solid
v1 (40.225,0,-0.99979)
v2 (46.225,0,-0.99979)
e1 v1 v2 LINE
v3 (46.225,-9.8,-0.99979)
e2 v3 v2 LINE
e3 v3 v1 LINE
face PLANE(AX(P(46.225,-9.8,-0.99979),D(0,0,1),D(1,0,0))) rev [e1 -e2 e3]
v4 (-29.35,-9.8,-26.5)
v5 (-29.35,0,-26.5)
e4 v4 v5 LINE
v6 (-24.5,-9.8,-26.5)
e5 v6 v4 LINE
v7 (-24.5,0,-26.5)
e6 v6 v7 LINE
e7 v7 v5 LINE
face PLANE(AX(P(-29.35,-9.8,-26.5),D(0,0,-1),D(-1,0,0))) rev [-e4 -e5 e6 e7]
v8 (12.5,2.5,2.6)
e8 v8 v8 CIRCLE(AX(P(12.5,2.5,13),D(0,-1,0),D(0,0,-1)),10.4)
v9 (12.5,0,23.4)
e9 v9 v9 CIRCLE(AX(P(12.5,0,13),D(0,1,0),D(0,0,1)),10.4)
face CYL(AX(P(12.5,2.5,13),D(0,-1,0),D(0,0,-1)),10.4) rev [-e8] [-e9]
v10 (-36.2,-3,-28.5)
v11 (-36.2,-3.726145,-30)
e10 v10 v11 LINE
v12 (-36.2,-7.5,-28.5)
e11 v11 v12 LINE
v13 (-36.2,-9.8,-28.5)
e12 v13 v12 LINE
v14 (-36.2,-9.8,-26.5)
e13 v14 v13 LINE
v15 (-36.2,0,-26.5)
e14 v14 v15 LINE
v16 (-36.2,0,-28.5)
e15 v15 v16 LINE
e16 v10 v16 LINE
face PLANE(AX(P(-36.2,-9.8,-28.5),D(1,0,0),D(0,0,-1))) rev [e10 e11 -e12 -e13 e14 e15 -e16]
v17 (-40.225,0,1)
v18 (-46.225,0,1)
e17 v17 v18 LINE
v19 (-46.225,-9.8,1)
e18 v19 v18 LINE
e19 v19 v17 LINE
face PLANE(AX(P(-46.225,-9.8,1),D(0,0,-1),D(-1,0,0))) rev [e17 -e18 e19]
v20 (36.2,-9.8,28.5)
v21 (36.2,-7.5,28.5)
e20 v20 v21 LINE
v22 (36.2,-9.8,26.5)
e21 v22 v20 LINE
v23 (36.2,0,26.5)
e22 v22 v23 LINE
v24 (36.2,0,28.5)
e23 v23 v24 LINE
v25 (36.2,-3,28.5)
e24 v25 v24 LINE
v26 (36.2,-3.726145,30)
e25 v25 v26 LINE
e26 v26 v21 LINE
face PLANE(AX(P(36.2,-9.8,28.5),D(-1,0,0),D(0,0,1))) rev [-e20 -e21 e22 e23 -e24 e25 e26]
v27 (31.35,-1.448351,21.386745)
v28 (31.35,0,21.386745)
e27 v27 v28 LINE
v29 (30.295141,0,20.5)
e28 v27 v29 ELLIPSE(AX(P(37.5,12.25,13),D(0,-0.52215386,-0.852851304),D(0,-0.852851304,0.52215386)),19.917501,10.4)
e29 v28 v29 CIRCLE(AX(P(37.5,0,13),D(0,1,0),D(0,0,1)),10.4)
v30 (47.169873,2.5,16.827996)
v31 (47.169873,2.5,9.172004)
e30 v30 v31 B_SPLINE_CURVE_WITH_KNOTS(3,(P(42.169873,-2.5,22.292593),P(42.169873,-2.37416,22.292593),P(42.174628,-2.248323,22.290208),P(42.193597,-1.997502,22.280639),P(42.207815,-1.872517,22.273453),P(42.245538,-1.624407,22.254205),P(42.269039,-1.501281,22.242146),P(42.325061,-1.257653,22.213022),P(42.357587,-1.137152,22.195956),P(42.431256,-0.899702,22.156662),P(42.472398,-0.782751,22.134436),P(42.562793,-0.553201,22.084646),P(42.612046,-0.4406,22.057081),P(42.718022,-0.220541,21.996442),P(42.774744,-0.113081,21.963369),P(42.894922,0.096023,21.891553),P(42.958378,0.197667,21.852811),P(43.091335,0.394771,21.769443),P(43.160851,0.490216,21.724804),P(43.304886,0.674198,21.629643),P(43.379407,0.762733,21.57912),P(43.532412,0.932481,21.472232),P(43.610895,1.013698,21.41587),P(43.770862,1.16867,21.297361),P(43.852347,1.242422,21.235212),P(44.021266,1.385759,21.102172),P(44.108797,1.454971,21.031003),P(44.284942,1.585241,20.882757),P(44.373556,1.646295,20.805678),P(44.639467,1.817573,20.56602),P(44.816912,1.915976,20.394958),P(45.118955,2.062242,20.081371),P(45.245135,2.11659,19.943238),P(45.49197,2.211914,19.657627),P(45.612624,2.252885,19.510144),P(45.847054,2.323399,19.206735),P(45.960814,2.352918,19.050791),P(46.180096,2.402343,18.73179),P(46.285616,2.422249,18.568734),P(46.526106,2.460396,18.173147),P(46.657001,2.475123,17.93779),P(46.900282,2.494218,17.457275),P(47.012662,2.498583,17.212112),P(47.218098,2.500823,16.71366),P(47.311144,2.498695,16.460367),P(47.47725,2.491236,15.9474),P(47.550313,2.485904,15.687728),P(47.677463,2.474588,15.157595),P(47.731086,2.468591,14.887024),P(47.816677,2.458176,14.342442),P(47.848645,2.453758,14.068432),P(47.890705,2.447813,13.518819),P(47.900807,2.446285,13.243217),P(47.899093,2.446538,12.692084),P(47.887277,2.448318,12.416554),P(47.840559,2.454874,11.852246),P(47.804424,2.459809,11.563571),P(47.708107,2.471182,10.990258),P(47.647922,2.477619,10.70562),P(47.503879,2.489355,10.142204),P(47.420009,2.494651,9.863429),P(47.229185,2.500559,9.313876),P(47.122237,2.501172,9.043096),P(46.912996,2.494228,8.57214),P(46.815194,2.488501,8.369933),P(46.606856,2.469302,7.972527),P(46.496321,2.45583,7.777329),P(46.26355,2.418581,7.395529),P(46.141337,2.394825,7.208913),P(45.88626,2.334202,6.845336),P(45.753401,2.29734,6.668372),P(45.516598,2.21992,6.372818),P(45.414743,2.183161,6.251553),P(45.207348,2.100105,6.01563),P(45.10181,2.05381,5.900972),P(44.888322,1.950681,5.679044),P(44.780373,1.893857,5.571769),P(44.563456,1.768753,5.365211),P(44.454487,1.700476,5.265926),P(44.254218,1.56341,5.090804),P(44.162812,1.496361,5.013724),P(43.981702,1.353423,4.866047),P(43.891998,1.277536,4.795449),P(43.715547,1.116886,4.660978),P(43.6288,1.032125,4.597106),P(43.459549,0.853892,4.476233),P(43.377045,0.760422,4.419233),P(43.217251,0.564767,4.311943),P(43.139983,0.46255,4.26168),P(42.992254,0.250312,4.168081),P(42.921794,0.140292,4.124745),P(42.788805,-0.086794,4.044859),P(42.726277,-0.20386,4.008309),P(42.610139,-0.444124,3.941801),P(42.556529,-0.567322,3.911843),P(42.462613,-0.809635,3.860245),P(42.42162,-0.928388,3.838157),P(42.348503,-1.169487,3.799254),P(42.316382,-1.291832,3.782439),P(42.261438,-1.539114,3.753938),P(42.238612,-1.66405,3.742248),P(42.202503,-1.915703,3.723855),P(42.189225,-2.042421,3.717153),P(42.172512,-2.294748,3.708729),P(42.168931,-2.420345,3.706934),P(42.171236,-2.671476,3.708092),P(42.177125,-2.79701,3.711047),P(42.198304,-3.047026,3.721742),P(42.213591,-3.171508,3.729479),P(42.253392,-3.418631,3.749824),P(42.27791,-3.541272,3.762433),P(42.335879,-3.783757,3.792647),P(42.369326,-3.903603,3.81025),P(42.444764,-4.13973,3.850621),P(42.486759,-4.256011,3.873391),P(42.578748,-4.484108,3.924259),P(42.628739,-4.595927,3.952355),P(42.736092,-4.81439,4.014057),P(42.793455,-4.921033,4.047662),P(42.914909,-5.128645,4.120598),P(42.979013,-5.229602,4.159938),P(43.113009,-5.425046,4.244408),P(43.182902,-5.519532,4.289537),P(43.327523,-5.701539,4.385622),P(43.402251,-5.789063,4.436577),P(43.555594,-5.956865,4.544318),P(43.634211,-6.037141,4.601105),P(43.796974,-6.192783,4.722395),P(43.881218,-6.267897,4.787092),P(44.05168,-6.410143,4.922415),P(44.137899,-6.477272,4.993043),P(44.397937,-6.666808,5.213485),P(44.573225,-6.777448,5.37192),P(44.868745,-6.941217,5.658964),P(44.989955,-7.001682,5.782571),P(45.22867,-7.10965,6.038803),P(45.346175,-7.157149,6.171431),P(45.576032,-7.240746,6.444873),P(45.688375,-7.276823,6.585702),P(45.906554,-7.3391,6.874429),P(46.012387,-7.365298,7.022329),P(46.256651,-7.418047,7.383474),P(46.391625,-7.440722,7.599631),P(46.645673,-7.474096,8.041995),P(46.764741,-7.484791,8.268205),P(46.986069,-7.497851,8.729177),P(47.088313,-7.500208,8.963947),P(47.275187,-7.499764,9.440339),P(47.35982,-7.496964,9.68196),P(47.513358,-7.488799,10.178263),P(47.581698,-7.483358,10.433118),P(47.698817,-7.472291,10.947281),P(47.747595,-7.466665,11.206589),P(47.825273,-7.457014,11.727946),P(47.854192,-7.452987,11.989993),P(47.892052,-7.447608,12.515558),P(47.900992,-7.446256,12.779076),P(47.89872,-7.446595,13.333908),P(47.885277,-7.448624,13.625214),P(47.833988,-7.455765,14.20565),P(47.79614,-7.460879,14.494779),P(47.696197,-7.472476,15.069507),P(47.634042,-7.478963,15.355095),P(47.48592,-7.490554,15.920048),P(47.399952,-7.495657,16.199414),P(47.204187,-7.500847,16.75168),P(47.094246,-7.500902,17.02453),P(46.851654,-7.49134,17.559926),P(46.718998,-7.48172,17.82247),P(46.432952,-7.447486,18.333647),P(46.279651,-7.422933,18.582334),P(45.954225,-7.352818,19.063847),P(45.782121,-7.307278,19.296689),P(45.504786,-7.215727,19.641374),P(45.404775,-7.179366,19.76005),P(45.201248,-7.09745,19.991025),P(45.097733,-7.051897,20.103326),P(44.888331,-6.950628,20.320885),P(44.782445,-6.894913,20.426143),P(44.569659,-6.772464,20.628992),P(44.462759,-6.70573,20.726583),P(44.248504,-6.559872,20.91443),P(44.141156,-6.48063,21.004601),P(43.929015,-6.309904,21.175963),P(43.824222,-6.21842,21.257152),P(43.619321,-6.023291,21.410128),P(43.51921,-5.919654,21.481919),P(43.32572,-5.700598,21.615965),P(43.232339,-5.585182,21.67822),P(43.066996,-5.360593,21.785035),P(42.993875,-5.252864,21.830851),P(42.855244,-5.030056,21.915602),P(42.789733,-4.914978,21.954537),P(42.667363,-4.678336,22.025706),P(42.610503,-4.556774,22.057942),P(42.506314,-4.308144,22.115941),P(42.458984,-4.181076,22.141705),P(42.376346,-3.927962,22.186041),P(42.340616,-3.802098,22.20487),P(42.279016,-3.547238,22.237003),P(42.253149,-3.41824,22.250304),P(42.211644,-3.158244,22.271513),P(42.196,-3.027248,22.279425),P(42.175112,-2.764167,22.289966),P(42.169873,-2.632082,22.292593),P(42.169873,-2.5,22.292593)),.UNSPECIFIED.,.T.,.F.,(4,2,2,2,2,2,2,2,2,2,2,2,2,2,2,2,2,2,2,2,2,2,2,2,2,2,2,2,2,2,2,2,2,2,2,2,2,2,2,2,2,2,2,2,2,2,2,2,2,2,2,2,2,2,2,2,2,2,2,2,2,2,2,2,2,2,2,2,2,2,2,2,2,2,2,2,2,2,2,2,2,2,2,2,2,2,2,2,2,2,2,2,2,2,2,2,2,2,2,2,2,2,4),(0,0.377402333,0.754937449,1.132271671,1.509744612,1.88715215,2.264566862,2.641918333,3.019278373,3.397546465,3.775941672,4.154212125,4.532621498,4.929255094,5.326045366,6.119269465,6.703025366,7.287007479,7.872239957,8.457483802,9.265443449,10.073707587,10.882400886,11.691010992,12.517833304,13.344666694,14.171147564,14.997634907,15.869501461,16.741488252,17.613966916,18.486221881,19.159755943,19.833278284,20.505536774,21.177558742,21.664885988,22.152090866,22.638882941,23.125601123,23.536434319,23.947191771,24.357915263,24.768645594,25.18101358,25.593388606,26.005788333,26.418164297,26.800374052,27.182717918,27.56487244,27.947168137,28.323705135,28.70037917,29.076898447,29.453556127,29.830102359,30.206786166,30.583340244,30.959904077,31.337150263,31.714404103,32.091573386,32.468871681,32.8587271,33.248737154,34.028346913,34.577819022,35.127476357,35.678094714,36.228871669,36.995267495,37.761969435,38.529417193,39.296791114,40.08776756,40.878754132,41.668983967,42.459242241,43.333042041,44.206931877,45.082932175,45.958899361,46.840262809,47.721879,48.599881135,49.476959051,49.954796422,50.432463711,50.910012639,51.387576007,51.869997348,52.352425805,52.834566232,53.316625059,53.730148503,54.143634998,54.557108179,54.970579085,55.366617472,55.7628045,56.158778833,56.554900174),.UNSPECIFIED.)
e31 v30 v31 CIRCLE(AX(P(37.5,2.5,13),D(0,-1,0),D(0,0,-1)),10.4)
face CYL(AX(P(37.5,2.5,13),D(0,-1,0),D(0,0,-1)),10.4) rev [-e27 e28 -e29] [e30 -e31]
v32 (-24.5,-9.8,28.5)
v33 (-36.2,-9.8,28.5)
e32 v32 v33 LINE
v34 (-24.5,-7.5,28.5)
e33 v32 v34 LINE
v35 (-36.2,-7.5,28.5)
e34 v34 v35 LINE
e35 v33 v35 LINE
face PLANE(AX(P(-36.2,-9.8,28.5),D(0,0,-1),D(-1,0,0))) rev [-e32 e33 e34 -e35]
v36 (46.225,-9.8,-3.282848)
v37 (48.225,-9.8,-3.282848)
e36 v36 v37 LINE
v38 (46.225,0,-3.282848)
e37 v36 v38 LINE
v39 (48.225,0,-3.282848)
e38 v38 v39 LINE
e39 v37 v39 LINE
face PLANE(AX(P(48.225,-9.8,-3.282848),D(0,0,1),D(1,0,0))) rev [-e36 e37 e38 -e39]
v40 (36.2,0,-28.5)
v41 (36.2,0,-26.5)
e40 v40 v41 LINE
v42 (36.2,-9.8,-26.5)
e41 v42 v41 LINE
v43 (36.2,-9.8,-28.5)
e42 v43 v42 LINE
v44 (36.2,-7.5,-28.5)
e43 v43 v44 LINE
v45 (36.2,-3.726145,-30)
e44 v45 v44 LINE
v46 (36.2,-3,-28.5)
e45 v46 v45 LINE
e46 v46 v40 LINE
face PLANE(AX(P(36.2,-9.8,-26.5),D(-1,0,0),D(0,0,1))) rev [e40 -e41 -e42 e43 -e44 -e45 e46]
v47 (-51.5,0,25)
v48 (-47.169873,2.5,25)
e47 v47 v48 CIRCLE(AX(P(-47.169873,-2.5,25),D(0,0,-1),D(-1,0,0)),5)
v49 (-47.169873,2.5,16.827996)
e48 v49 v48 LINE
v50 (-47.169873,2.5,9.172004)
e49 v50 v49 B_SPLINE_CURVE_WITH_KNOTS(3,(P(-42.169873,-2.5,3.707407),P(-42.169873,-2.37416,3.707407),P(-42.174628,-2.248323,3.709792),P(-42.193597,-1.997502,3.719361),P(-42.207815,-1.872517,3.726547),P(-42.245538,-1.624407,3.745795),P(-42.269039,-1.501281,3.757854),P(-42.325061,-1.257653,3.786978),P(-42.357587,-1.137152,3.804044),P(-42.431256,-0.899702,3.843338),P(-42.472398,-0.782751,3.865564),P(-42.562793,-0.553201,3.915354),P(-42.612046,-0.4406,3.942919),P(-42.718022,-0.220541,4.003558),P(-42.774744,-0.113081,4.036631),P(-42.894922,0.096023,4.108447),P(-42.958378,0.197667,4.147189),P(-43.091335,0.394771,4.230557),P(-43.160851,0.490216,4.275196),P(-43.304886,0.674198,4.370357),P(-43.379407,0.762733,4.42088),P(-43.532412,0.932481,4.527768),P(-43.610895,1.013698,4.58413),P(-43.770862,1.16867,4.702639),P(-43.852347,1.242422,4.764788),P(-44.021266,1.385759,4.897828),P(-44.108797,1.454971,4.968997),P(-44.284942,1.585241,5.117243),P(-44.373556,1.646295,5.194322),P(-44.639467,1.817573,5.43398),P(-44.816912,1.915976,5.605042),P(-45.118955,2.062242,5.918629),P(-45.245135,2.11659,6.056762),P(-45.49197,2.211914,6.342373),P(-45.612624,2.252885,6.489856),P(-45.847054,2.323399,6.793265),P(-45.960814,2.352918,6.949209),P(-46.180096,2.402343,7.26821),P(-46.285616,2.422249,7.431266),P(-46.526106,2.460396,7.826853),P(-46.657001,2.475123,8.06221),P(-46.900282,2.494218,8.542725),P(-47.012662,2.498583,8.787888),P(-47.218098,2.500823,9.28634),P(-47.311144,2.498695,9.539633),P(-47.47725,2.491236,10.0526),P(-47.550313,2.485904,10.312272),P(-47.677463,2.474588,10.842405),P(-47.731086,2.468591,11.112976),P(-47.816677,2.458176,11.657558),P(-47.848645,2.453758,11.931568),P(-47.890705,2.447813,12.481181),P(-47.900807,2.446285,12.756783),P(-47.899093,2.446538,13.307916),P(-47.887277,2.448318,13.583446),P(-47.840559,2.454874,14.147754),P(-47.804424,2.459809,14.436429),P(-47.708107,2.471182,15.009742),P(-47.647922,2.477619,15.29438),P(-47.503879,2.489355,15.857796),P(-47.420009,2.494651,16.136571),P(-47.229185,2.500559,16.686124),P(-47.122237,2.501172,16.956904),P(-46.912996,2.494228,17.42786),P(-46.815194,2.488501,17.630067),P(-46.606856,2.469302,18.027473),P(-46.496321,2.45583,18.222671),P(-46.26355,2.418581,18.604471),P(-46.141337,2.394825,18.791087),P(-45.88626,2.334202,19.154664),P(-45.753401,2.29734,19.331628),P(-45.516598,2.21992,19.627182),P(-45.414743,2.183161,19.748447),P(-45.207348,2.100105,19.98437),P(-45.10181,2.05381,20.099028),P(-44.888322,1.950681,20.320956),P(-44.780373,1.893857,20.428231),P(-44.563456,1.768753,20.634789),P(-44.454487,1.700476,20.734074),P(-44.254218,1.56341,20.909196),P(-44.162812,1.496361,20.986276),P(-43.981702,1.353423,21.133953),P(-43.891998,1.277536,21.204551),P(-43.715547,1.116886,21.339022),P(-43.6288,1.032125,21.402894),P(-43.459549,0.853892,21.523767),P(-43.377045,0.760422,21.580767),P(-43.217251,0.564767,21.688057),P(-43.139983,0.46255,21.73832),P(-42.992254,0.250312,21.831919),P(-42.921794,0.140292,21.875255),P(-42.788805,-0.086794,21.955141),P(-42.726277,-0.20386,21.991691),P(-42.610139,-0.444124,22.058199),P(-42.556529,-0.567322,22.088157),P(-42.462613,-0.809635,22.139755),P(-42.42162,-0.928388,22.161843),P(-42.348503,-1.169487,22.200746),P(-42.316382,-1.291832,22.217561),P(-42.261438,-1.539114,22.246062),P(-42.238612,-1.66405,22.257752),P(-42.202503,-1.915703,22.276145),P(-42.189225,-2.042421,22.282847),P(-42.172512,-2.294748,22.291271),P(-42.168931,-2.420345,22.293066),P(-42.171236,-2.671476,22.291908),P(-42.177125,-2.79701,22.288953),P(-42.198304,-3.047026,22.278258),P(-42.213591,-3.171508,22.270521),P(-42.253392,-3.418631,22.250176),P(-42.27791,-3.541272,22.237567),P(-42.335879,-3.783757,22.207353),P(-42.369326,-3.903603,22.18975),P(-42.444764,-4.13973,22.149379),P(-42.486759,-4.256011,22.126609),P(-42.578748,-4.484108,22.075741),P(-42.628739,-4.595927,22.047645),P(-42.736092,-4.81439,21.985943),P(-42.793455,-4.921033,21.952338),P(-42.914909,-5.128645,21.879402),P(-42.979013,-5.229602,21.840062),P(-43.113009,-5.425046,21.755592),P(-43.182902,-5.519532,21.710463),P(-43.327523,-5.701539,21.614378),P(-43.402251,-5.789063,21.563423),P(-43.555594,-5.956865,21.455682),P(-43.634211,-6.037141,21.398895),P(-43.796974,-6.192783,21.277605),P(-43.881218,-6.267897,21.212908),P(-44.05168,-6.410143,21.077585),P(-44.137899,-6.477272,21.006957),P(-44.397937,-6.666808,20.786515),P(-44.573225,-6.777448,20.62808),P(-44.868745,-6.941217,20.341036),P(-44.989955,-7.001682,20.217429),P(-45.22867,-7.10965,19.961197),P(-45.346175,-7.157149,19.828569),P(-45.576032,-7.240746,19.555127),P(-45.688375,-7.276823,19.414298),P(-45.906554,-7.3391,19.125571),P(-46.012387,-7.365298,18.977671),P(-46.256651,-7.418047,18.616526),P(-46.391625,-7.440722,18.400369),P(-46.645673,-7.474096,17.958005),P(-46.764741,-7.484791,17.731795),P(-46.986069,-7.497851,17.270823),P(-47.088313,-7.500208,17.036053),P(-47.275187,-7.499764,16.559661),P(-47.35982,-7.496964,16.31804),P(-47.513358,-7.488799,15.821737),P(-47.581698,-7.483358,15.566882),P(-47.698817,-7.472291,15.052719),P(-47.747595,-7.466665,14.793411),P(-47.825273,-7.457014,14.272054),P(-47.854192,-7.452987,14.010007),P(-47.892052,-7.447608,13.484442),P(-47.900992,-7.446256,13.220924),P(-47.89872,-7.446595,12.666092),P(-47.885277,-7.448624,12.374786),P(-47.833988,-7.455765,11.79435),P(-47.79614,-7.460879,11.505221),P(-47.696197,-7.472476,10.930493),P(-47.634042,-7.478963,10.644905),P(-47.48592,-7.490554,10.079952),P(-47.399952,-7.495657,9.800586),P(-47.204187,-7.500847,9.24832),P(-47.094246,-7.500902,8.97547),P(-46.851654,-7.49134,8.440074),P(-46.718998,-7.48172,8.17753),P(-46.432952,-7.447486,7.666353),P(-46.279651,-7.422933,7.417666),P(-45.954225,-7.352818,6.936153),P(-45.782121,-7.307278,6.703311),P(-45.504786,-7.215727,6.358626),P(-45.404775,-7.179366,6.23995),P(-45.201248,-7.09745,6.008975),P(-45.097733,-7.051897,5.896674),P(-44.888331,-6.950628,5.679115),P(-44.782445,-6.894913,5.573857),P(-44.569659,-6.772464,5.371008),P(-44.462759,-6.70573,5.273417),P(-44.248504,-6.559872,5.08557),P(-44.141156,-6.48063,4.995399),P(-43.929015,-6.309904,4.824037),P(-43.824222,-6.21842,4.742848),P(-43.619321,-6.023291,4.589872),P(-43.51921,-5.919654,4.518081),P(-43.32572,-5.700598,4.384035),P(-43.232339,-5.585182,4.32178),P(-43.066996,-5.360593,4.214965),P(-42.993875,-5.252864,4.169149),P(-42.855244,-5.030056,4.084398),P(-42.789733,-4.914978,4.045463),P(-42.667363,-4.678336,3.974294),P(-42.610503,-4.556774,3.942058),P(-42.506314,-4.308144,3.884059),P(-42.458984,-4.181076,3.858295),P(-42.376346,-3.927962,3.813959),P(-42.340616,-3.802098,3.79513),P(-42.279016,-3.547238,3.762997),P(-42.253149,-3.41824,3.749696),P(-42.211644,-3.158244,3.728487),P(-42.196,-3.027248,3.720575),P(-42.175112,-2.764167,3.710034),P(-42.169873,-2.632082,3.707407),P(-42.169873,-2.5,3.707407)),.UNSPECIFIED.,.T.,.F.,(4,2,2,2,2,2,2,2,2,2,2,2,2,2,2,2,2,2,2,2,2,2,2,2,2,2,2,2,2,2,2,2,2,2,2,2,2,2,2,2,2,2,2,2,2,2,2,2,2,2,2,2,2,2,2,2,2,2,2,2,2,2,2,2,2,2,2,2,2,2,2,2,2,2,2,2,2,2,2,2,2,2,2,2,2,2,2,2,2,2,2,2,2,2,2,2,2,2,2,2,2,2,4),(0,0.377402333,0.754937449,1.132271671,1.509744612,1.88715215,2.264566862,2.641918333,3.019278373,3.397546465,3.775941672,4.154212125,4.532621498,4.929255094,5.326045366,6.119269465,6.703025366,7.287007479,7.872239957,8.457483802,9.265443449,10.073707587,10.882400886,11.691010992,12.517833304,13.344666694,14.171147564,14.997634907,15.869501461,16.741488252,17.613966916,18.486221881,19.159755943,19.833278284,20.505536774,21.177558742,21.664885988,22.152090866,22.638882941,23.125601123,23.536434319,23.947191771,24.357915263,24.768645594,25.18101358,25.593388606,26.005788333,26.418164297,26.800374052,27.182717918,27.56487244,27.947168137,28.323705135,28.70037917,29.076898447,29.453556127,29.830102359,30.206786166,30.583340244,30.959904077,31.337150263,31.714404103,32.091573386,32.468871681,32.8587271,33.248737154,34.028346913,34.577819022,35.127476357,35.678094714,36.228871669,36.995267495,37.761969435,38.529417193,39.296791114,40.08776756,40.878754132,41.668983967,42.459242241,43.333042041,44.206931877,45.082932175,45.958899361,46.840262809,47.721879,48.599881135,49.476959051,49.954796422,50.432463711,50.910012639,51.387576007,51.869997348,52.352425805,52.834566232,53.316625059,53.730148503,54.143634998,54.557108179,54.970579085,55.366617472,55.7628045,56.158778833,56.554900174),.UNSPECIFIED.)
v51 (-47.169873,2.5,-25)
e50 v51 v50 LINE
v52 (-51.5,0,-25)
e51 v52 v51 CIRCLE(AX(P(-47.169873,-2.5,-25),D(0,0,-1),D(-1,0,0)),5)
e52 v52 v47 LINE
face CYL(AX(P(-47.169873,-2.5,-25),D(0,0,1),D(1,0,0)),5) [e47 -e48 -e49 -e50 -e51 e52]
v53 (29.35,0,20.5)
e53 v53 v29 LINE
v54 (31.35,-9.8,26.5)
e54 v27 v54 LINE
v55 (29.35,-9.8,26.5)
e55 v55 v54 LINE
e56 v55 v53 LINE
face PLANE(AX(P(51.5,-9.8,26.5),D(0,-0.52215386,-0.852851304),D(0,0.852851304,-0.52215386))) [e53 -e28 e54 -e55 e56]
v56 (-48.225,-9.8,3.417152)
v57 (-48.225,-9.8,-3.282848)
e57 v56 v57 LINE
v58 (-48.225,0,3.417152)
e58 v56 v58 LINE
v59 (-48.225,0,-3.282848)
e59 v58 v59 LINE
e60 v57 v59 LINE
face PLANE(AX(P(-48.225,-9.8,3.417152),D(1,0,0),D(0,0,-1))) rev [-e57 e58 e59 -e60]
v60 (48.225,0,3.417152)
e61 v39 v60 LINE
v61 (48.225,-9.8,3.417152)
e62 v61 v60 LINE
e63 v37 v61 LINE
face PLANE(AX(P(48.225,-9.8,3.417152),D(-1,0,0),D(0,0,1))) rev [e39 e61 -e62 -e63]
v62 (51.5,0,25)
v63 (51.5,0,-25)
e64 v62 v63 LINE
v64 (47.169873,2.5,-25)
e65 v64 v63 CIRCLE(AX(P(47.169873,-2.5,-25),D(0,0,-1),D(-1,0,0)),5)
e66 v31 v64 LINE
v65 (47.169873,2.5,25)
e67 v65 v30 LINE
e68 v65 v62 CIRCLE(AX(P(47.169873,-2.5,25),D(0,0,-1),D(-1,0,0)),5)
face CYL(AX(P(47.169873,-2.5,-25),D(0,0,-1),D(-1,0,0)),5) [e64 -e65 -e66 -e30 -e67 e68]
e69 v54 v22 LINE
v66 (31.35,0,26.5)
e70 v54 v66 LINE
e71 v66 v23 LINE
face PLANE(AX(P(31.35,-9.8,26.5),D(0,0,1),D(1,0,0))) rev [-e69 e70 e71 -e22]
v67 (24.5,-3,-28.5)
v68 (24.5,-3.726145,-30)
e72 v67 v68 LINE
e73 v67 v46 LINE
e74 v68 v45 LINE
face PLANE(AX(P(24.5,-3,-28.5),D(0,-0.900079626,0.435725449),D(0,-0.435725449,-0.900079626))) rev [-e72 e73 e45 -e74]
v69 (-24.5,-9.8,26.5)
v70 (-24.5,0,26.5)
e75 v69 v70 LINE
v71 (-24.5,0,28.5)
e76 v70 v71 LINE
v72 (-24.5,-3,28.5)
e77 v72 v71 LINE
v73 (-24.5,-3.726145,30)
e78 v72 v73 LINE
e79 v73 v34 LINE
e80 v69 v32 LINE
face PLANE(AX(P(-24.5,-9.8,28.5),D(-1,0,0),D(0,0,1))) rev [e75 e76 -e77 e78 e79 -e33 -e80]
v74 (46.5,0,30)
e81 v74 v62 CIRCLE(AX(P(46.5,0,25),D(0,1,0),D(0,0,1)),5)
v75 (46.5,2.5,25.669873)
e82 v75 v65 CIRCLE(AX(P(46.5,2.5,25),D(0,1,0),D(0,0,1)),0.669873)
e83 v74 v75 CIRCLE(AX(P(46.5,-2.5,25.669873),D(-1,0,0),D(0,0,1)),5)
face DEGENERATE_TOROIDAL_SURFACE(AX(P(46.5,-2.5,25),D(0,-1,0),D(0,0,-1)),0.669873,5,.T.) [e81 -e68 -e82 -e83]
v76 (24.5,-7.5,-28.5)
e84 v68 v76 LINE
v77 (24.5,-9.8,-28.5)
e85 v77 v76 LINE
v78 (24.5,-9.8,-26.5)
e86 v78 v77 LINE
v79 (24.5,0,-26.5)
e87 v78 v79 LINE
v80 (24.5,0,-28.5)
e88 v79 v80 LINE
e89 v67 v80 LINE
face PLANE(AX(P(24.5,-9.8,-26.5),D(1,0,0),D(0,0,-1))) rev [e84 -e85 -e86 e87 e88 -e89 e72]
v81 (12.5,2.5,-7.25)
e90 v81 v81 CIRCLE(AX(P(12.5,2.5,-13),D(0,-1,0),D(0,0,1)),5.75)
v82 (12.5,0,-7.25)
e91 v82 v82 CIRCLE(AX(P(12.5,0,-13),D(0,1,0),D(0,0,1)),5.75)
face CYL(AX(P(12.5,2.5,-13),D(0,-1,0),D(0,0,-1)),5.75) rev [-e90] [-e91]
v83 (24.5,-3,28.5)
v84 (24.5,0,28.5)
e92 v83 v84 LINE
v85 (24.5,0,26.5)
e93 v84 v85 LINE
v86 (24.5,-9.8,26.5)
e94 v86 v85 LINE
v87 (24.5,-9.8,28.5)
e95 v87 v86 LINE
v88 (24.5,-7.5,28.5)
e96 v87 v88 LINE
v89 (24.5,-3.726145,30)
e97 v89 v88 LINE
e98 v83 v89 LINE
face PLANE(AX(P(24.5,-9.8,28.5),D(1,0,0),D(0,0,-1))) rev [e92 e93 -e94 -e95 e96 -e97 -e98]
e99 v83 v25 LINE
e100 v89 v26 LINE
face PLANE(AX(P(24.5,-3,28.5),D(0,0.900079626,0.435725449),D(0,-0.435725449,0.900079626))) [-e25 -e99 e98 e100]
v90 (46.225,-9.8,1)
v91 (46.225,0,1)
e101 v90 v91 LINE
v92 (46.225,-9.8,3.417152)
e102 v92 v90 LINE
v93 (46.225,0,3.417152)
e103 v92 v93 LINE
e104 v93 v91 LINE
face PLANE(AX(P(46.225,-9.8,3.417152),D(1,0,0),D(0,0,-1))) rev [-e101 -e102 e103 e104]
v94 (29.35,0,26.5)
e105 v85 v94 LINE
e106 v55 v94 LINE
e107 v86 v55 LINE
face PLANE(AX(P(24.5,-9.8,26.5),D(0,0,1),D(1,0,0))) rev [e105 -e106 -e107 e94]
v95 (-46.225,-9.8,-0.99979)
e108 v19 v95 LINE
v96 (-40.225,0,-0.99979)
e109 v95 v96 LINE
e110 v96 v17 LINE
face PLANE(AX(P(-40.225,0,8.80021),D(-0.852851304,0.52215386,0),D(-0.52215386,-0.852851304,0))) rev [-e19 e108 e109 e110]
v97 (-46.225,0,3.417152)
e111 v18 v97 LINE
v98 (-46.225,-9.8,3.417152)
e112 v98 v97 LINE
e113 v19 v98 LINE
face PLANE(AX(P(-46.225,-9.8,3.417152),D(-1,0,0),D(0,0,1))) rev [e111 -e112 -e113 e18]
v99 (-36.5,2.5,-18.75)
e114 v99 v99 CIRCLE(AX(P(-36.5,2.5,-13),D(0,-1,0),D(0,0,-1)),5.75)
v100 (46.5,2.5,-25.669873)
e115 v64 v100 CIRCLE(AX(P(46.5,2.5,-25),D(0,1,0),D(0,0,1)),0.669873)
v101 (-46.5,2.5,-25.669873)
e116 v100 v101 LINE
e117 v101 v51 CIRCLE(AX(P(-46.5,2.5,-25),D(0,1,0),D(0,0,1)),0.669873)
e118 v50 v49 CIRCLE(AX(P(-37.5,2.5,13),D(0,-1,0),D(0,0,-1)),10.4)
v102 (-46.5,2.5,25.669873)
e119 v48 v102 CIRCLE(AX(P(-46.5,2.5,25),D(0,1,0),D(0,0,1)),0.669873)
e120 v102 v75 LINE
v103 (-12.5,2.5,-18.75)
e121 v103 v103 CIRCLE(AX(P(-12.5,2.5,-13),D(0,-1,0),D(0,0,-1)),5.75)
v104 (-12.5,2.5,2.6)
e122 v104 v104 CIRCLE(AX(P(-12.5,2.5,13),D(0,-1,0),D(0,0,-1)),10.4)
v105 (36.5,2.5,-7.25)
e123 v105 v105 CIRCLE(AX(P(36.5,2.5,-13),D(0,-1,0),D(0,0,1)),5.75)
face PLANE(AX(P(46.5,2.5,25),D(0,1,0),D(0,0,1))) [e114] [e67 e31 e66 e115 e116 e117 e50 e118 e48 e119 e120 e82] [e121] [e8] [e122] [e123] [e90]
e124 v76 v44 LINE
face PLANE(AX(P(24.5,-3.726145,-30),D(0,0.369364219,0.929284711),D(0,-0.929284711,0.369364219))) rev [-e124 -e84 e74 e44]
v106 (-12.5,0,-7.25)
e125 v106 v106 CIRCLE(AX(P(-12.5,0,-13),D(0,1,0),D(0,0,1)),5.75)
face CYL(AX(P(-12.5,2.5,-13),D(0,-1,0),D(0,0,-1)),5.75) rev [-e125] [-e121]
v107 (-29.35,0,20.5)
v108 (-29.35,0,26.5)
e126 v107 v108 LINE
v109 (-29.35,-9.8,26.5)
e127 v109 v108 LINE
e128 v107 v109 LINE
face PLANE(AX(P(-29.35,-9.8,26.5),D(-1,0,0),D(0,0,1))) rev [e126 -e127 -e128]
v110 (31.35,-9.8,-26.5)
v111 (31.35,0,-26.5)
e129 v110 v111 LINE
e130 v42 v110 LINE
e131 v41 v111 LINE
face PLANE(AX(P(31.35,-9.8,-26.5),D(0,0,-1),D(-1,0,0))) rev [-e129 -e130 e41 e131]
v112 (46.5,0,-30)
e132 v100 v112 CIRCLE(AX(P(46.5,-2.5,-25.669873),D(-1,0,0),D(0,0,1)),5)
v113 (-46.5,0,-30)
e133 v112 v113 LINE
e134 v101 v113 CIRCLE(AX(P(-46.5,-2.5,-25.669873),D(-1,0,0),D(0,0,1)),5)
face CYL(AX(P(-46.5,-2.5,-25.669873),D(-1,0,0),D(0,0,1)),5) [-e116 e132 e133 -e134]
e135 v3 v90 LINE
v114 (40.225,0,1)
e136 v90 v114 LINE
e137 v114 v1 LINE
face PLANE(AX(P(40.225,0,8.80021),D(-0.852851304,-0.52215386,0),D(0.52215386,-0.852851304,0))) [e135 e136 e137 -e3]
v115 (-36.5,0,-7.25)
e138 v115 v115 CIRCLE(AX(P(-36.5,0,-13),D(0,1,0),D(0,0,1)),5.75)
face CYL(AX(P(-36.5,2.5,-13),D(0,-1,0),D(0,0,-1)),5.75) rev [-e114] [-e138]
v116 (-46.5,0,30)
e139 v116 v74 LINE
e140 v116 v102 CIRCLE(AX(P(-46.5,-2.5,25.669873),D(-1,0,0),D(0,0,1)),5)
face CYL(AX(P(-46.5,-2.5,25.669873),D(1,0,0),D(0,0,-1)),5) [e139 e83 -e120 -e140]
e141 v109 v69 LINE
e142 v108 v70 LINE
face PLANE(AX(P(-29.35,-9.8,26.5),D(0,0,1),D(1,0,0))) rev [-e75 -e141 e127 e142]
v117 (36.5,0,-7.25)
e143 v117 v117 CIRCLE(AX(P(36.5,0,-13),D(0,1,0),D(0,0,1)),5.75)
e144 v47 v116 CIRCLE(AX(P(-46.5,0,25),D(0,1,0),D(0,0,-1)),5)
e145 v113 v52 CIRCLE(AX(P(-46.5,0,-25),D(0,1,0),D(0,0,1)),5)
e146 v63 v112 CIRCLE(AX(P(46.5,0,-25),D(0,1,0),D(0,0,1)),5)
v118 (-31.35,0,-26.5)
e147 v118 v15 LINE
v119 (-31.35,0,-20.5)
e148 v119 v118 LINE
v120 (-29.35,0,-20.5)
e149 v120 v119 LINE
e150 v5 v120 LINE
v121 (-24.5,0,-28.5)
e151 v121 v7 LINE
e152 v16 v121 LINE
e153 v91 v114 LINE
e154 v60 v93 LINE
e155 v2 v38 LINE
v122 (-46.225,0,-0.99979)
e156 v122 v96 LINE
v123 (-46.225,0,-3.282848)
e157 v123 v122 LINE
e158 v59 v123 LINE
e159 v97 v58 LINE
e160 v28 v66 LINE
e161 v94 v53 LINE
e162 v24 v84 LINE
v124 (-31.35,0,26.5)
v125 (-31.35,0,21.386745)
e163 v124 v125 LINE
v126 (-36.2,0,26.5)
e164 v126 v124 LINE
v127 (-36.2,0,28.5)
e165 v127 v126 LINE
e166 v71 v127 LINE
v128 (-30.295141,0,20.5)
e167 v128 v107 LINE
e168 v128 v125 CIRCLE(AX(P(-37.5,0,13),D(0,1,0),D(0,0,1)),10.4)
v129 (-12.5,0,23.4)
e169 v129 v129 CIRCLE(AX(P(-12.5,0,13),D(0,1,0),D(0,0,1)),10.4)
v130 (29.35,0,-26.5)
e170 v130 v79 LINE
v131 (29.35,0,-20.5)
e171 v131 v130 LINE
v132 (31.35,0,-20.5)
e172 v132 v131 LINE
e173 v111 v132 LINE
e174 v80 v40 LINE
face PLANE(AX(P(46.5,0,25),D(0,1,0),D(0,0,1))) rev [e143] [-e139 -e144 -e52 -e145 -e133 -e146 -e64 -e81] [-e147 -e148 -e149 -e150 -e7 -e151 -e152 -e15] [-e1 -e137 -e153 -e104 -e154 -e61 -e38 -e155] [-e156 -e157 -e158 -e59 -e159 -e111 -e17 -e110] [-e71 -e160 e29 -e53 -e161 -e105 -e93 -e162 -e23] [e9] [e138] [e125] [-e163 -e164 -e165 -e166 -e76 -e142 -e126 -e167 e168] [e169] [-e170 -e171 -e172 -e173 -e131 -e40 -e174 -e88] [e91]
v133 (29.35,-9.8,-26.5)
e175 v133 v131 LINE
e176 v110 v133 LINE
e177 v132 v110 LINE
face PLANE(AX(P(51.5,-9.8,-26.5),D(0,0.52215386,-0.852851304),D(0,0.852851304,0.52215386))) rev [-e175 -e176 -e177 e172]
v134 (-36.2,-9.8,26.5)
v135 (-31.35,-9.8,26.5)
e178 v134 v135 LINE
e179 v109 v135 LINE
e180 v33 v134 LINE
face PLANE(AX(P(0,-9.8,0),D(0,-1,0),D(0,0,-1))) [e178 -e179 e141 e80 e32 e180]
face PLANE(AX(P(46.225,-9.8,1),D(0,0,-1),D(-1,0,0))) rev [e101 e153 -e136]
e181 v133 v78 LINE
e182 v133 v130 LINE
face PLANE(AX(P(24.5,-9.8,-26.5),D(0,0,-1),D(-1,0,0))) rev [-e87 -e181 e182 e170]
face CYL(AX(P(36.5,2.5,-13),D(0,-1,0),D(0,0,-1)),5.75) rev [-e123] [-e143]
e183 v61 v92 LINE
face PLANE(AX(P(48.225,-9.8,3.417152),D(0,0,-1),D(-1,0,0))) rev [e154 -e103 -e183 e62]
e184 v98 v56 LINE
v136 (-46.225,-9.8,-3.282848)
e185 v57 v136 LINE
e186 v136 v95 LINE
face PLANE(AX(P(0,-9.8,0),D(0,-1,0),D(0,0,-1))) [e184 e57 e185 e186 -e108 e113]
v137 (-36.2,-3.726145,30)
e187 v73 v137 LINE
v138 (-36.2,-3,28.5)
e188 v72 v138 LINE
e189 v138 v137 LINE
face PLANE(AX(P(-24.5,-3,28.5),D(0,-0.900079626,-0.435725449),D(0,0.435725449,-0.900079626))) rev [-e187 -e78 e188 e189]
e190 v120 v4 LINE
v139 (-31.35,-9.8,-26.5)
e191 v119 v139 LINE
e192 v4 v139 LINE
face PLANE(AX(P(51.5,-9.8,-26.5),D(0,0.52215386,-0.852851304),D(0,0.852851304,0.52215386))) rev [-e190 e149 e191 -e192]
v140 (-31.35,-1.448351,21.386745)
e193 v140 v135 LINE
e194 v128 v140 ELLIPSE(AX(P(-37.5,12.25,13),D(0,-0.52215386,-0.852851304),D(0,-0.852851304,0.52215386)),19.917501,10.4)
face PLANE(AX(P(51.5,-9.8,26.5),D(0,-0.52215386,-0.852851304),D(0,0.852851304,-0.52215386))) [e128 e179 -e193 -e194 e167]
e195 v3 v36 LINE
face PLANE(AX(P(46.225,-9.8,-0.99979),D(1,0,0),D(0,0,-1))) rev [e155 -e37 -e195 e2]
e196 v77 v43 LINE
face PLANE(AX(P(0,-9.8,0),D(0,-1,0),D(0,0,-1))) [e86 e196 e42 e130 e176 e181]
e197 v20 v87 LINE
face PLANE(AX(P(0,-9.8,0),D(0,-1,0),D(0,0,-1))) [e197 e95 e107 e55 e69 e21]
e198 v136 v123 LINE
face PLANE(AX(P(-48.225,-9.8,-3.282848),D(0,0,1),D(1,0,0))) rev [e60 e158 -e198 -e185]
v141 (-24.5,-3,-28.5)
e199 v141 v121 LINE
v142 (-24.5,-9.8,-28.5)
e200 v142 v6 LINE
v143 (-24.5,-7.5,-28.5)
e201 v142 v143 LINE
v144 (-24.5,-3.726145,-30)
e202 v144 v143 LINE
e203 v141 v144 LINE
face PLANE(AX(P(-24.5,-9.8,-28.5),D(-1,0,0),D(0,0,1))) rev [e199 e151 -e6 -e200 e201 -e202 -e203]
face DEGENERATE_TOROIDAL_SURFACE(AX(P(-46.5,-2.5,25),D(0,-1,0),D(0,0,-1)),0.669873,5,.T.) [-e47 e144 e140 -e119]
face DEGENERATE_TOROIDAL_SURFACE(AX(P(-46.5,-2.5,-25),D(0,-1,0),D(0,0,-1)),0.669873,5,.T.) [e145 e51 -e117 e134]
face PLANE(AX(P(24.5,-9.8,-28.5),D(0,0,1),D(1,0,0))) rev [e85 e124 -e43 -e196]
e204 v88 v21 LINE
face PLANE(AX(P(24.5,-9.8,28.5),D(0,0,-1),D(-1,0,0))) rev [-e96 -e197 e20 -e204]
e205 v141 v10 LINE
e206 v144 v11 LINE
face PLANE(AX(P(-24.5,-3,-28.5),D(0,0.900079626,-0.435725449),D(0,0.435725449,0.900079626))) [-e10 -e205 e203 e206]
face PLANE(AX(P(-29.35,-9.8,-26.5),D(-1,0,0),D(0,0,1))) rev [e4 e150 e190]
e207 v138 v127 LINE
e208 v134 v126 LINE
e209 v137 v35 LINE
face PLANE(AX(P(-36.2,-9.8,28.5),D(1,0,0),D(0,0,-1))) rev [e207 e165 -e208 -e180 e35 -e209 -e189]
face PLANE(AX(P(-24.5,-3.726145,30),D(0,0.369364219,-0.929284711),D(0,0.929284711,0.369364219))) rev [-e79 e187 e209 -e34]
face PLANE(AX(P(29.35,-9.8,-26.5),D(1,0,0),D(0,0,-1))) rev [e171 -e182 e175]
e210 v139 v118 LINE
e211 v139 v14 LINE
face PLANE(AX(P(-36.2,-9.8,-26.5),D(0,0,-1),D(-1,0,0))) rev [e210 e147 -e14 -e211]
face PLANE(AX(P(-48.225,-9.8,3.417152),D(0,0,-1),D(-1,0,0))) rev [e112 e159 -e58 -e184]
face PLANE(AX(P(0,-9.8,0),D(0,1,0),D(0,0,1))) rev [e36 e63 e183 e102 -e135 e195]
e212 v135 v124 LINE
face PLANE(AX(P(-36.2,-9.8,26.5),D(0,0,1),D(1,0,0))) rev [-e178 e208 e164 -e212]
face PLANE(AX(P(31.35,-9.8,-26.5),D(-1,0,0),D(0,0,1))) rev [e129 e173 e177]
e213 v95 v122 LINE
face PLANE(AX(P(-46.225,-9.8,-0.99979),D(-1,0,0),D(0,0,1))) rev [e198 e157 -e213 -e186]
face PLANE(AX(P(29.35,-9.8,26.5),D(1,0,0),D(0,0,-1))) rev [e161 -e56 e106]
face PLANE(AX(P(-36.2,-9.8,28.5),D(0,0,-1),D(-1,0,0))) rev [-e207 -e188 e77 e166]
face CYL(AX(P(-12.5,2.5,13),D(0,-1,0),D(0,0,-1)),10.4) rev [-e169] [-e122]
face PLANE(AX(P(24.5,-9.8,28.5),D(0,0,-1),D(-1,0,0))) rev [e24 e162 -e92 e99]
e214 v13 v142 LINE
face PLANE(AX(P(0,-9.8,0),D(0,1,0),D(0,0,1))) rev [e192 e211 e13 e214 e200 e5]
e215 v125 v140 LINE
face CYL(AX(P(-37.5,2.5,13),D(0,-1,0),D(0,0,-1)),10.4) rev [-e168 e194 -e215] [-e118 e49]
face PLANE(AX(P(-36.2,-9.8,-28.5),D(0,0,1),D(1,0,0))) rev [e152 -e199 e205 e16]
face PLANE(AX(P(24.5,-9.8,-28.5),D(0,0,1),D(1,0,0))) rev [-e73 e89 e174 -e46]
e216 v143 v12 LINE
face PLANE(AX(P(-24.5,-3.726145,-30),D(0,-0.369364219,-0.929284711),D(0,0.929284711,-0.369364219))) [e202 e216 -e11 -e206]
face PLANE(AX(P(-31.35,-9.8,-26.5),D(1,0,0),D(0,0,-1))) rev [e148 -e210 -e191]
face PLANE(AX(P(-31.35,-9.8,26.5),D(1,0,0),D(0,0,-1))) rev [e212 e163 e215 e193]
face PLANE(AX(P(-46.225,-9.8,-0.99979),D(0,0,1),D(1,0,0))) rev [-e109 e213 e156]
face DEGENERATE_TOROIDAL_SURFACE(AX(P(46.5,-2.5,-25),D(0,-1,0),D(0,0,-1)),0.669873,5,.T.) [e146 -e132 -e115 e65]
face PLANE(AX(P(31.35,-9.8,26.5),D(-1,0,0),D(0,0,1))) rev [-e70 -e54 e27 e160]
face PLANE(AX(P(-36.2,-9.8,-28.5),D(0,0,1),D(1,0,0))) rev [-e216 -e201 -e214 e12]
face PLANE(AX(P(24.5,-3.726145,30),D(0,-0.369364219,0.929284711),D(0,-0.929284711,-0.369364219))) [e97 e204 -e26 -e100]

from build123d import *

# Parameters (mm, degrees)
BOSS_EXTRUDE1_DEPTH     = 2.5
FILLET1_R               = 5
BOSS_EXTRUDE2_DEPTH     = 9.8
CUT_EXTRUDE1_DEPTH      = 9.8
CUT_EXTRUDE2_DEPTH      = 89.657557489
BOSS_EXTRUDE3_DEPTH     = 11.7
MIRROR4_COPY_1_DEPTH    = 11.7
CUT_EXTRUDE3_DEPTH      = 61.401076149
CUT_EXTRUDE3_DEPTH_BACK = 61.401076149
SKETCH7_R               = 10.4
SKETCH7_R_2             = 5.75


with BuildPart() as part:
    # Sketch1 → Boss-Extrude1 (new body)
    with BuildSketch(Plane(origin=(0, 0, 0), x_dir=(1, 0, 0), z_dir=(0, 1, 0))):
        with BuildLine():
            Line((-46.5, 30), (46.5, 30))
            ThreePointArc((46.5, 30), (50.035533906, 28.535533906), (51.5, 25))
            Line((51.5, 25), (51.5, -25))
            ThreePointArc((51.5, -25), (50.035533906, -28.535533906), (46.5, -30))
            Line((46.5, -30), (-46.5, -30))
            ThreePointArc((-46.5, -30), (-50.035533906, -28.535533906), (-51.5, -25))
            Line((-51.5, -25), (-51.5, 25))
            ThreePointArc((-51.5, 25), (-50.035533906, 28.535533906), (-46.5, 30))
        make_face()
    extrude(amount=BOSS_EXTRUDE1_DEPTH)

    # Fillet1
    # the kernel refuses this fillet: 5 mm, written as the material it takes off along each edge
    with BuildSketch(Plane(origin=(-46.5, 2.5, -25), x_dir=(-1, 0, 0), z_dir=(0, 0, 1))) as fillet1_piece_1:
        with BuildLine():
            CenterArc((0.669872981, 5), FILLET1_R, 270, 60)
            Line((0.669872981, 0), (0.669872981, -0.1))
            Line((0.669872981, -0.1), (5, -0.1))
            Line((5, -0.1), (5.1, 0))
            ThreePointArc((5.1, 0), (5.1, 1.25), (5.08660254, 2.45))
            Line((5.08660254, 2.45), (5, 2.5))
        make_face()
    revolve(axis=Axis((-46.5, 2.5, -25), (0, -1, 0)), revolution_arc=90, mode=Mode.SUBTRACT)
    with BuildSketch(Plane(origin=(-46.5, 2.5, -30), x_dir=(0, -1, 0), z_dir=(1, 0, 0)), Plane(origin=(46.5, 2.5, 30), x_dir=(0, -1, 0), z_dir=(-1, 0, 0))) as fillet1_piece_2:
        with BuildLine():
            CenterArc((5, -4.330127019), FILLET1_R, 120, 60)
            Line((0, -4.330127019), (-0.1, -4.330127019))
            Line((-0.1, -4.330127019), (-0.1, 0))
            Line((-0.1, 0), (0, 0.1))
            ThreePointArc((0, 0.1), (1.25, 0.1), (2.45, 0.08660254))
            Line((2.45, 0.08660254), (2.5, 0))
        make_face()
    extrude(amount=93, mode=Mode.SUBTRACT)
    with BuildSketch(Plane(origin=(46.5, 2.5, -25), x_dir=(0, 0, -1), z_dir=(-1, 0, 0))) as fillet1_piece_3:
        with BuildLine():
            CenterArc((0.669872981, 5), FILLET1_R, 270, 60)
            Line((0.669872981, 0), (0.669872981, -0.1))
            Line((0.669872981, -0.1), (5, -0.1))
            Line((5, -0.1), (5.1, 0))
            ThreePointArc((5.1, 0), (5.1, 1.25), (5.08660254, 2.45))
            Line((5.08660254, 2.45), (5, 2.5))
        make_face()
    revolve(axis=Axis((46.5, 2.5, -25), (0, -1, 0)), revolution_arc=90, mode=Mode.SUBTRACT)
    with BuildSketch(Plane(origin=(51.5, 2.5, -25), x_dir=(0, -1, 0), z_dir=(0, 0, 1)), Plane(origin=(-51.5, 2.5, 25), x_dir=(0, -1, 0), z_dir=(0, 0, -1))) as fillet1_piece_4:
        with BuildLine():
            CenterArc((5, -4.330127019), FILLET1_R, 120, 60)
            Line((0, -4.330127019), (-0.1, -4.330127019))
            Line((-0.1, -4.330127019), (-0.1, 0))
            Line((-0.1, 0), (0, 0.1))
            ThreePointArc((0, 0.1), (1.25, 0.1), (2.45, 0.08660254))
            Line((2.45, 0.08660254), (2.5, 0))
        make_face()
    extrude(amount=50, mode=Mode.SUBTRACT)
    with BuildSketch(Plane(origin=(46.5, 2.5, 25), x_dir=(1, 0, 0), z_dir=(0, 0, -1))) as fillet1_piece_5:
        with BuildLine():
            CenterArc((0.669872981, 5), FILLET1_R, 270, 60)
            Line((0.669872981, 0), (0.669872981, -0.1))
            Line((0.669872981, -0.1), (5, -0.1))
            Line((5, -0.1), (5.1, 0))
            ThreePointArc((5.1, 0), (5.1, 1.25), (5.08660254, 2.45))
            Line((5.08660254, 2.45), (5, 2.5))
        make_face()
    revolve(axis=Axis((46.5, 2.5, 25), (0, -1, 0)), revolution_arc=90, mode=Mode.SUBTRACT)
    with BuildSketch(Plane(origin=(-46.5, 2.5, 25), x_dir=(0, 0, 1), z_dir=(1, 0, 0))) as fillet1_piece_6:
        with BuildLine():
            CenterArc((0.669872981, 5), FILLET1_R, 270, 60)
            Line((0.669872981, 0), (0.669872981, -0.1))
            Line((0.669872981, -0.1), (5, -0.1))
            Line((5, -0.1), (5.1, 0))
            ThreePointArc((5.1, 0), (5.1, 1.25), (5.08660254, 2.45))
            Line((5.08660254, 2.45), (5, 2.5))
        make_face()
    revolve(axis=Axis((-46.5, 2.5, 25), (0, -1, 0)), revolution_arc=90, mode=Mode.SUBTRACT)

    # Sketch2 → Boss-Extrude2 (add)
    with BuildSketch(Plane.XZ):
        Polygon((-36.2, 28.5), (-24.5, 28.5), (-24.5, 26.5), (-29.35, 26.5), (-29.35, 20.5), (-31.35, 20.5), (-31.35, 26.5), (-36.2, 26.5), align=None)
        Polygon((48.225, -3.282847821), (46.225, -3.282847821), (46.225, -0.999790058), (40.225, -0.999790058), (40.225, 1), (46.225, 1), (46.225, 3.417152179), (48.225, 3.417152179), align=None)
        Polygon((24.5, 28.5), (36.2, 28.5), (36.2, 26.5), (31.35, 26.5), (31.35, 20.5), (29.35, 20.5), (29.35, 26.5), (24.5, 26.5), align=None)
        Polygon((24.5, -26.5), (29.35, -26.5), (29.35, -20.5), (31.35, -20.5), (31.35, -26.5), (36.2, -26.5), (36.2, -28.5), (24.5, -28.5), align=None)
        Polygon((-36.2, -28.5), (-24.5, -28.5), (-24.5, -26.5), (-29.35, -26.5), (-29.35, -20.5), (-31.35, -20.5), (-31.35, -26.5), (-36.2, -26.5), align=None)
        Polygon((-48.225, 3.417152179), (-46.225, 3.417152179), (-46.225, 1), (-40.225, 1), (-40.225, -0.999790058), (-46.225, -0.999790058), (-46.225, -3.282847821), (-48.225, -3.282847821), align=None)
    extrude(amount=BOSS_EXTRUDE2_DEPTH)

    # Sketch4 → Cut-Extrude1 (cut)
    with BuildSketch(Plane(origin=(0, 0, -0.999790058), x_dir=(-1, 0, 0), z_dir=(0, 0, -1))):
        Polygon((40.225, 0), (46.225, -9.8), (40.225, -9.8), align=None)
    cut_extrude1 = extrude(amount=-CUT_EXTRUDE1_DEPTH, mode=Mode.SUBTRACT)

    # Mirror1: Cut-Extrude1 across plane
    add(cut_extrude1.mirror(Plane(origin=(0, 0, 0), x_dir=(0, 0, 1), z_dir=(1, 0, 0))), mode=Mode.SUBTRACT)

    # Sketch5 → Cut-Extrude2 (cut, through all)
    with BuildSketch(Plane.ZY.offset(31.35)):
        Polygon((-26.5, -9.8), (-20.5, 0), (-20.5, -9.8), align=None)
    cut_extrude2 = extrude(amount=-CUT_EXTRUDE2_DEPTH, mode=Mode.SUBTRACT)

    # Mirror2: Cut-Extrude2 across plane
    add(cut_extrude2.mirror(Plane.XY), mode=Mode.SUBTRACT)

    # Sketch6 → Boss-Extrude3 (add)
    with BuildSketch(Plane(origin=(36.2, 0, 0), x_dir=(0, 0, -1), z_dir=(1, 0, 0))):
        Polygon((-28.5, -3), (-28.5, -7.5), (-30, -3.726144837), align=None)
    boss_extrude3 = extrude(amount=-BOSS_EXTRUDE3_DEPTH)

    # Mirror3: Boss-Extrude3 across plane
    add(boss_extrude3.mirror(Plane(origin=(0, 0, 0), x_dir=(0, 0, 1), z_dir=(1, 0, 0))))

    # Mirror4: Boss-Extrude3 across plane
    add(boss_extrude3.mirror(Plane.XY))

    # Mirror4 copy 1 sketch → Mirror4 copy 1 (add)
    with BuildSketch(Plane.ZY.offset(36.2)):
        Polygon((-28.5, -3), (-28.5, -7.5), (-30, -3.726144837), align=None)
    extrude(amount=-MIRROR4_COPY_1_DEPTH)

    # Sketch7 → Cut-Extrude3 (cut, two sides: drawn at the far end of the back side and taken through both)
    with BuildSketch(Plane.XZ.offset(-CUT_EXTRUDE3_DEPTH_BACK)):
        with Locations(Location((-37.5, 13, 0), (0, 0, 201.597043682))):
            Circle(SKETCH7_R)
        with Locations(Location((-12.5, 13, 0), (0, 0, 270))):
            Circle(SKETCH7_R)
        with Locations(Location((-36.5, -13, 0), (0, 0, 270))):
            Circle(SKETCH7_R_2)
        with Locations(Location((12.5, 13, 0), (0, 0, 270))):
            Circle(SKETCH7_R)
        with Locations(Location((37.5, 13, 0), (0, 0, 338.402956318))):
            Circle(SKETCH7_R)
        with Locations(Location((-12.5, -13, 0), (0, 0, 270))):
            Circle(SKETCH7_R_2)
        with Locations(Location((12.5, -13, 0), (0, 0, 90))):
            Circle(SKETCH7_R_2)
        with Locations(Location((36.5, -13, 0), (0, 0, 90))):
            Circle(SKETCH7_R_2)
    extrude(amount=CUT_EXTRUDE3_DEPTH + CUT_EXTRUDE3_DEPTH_BACK, mode=Mode.SUBTRACT)


solid = part.part
